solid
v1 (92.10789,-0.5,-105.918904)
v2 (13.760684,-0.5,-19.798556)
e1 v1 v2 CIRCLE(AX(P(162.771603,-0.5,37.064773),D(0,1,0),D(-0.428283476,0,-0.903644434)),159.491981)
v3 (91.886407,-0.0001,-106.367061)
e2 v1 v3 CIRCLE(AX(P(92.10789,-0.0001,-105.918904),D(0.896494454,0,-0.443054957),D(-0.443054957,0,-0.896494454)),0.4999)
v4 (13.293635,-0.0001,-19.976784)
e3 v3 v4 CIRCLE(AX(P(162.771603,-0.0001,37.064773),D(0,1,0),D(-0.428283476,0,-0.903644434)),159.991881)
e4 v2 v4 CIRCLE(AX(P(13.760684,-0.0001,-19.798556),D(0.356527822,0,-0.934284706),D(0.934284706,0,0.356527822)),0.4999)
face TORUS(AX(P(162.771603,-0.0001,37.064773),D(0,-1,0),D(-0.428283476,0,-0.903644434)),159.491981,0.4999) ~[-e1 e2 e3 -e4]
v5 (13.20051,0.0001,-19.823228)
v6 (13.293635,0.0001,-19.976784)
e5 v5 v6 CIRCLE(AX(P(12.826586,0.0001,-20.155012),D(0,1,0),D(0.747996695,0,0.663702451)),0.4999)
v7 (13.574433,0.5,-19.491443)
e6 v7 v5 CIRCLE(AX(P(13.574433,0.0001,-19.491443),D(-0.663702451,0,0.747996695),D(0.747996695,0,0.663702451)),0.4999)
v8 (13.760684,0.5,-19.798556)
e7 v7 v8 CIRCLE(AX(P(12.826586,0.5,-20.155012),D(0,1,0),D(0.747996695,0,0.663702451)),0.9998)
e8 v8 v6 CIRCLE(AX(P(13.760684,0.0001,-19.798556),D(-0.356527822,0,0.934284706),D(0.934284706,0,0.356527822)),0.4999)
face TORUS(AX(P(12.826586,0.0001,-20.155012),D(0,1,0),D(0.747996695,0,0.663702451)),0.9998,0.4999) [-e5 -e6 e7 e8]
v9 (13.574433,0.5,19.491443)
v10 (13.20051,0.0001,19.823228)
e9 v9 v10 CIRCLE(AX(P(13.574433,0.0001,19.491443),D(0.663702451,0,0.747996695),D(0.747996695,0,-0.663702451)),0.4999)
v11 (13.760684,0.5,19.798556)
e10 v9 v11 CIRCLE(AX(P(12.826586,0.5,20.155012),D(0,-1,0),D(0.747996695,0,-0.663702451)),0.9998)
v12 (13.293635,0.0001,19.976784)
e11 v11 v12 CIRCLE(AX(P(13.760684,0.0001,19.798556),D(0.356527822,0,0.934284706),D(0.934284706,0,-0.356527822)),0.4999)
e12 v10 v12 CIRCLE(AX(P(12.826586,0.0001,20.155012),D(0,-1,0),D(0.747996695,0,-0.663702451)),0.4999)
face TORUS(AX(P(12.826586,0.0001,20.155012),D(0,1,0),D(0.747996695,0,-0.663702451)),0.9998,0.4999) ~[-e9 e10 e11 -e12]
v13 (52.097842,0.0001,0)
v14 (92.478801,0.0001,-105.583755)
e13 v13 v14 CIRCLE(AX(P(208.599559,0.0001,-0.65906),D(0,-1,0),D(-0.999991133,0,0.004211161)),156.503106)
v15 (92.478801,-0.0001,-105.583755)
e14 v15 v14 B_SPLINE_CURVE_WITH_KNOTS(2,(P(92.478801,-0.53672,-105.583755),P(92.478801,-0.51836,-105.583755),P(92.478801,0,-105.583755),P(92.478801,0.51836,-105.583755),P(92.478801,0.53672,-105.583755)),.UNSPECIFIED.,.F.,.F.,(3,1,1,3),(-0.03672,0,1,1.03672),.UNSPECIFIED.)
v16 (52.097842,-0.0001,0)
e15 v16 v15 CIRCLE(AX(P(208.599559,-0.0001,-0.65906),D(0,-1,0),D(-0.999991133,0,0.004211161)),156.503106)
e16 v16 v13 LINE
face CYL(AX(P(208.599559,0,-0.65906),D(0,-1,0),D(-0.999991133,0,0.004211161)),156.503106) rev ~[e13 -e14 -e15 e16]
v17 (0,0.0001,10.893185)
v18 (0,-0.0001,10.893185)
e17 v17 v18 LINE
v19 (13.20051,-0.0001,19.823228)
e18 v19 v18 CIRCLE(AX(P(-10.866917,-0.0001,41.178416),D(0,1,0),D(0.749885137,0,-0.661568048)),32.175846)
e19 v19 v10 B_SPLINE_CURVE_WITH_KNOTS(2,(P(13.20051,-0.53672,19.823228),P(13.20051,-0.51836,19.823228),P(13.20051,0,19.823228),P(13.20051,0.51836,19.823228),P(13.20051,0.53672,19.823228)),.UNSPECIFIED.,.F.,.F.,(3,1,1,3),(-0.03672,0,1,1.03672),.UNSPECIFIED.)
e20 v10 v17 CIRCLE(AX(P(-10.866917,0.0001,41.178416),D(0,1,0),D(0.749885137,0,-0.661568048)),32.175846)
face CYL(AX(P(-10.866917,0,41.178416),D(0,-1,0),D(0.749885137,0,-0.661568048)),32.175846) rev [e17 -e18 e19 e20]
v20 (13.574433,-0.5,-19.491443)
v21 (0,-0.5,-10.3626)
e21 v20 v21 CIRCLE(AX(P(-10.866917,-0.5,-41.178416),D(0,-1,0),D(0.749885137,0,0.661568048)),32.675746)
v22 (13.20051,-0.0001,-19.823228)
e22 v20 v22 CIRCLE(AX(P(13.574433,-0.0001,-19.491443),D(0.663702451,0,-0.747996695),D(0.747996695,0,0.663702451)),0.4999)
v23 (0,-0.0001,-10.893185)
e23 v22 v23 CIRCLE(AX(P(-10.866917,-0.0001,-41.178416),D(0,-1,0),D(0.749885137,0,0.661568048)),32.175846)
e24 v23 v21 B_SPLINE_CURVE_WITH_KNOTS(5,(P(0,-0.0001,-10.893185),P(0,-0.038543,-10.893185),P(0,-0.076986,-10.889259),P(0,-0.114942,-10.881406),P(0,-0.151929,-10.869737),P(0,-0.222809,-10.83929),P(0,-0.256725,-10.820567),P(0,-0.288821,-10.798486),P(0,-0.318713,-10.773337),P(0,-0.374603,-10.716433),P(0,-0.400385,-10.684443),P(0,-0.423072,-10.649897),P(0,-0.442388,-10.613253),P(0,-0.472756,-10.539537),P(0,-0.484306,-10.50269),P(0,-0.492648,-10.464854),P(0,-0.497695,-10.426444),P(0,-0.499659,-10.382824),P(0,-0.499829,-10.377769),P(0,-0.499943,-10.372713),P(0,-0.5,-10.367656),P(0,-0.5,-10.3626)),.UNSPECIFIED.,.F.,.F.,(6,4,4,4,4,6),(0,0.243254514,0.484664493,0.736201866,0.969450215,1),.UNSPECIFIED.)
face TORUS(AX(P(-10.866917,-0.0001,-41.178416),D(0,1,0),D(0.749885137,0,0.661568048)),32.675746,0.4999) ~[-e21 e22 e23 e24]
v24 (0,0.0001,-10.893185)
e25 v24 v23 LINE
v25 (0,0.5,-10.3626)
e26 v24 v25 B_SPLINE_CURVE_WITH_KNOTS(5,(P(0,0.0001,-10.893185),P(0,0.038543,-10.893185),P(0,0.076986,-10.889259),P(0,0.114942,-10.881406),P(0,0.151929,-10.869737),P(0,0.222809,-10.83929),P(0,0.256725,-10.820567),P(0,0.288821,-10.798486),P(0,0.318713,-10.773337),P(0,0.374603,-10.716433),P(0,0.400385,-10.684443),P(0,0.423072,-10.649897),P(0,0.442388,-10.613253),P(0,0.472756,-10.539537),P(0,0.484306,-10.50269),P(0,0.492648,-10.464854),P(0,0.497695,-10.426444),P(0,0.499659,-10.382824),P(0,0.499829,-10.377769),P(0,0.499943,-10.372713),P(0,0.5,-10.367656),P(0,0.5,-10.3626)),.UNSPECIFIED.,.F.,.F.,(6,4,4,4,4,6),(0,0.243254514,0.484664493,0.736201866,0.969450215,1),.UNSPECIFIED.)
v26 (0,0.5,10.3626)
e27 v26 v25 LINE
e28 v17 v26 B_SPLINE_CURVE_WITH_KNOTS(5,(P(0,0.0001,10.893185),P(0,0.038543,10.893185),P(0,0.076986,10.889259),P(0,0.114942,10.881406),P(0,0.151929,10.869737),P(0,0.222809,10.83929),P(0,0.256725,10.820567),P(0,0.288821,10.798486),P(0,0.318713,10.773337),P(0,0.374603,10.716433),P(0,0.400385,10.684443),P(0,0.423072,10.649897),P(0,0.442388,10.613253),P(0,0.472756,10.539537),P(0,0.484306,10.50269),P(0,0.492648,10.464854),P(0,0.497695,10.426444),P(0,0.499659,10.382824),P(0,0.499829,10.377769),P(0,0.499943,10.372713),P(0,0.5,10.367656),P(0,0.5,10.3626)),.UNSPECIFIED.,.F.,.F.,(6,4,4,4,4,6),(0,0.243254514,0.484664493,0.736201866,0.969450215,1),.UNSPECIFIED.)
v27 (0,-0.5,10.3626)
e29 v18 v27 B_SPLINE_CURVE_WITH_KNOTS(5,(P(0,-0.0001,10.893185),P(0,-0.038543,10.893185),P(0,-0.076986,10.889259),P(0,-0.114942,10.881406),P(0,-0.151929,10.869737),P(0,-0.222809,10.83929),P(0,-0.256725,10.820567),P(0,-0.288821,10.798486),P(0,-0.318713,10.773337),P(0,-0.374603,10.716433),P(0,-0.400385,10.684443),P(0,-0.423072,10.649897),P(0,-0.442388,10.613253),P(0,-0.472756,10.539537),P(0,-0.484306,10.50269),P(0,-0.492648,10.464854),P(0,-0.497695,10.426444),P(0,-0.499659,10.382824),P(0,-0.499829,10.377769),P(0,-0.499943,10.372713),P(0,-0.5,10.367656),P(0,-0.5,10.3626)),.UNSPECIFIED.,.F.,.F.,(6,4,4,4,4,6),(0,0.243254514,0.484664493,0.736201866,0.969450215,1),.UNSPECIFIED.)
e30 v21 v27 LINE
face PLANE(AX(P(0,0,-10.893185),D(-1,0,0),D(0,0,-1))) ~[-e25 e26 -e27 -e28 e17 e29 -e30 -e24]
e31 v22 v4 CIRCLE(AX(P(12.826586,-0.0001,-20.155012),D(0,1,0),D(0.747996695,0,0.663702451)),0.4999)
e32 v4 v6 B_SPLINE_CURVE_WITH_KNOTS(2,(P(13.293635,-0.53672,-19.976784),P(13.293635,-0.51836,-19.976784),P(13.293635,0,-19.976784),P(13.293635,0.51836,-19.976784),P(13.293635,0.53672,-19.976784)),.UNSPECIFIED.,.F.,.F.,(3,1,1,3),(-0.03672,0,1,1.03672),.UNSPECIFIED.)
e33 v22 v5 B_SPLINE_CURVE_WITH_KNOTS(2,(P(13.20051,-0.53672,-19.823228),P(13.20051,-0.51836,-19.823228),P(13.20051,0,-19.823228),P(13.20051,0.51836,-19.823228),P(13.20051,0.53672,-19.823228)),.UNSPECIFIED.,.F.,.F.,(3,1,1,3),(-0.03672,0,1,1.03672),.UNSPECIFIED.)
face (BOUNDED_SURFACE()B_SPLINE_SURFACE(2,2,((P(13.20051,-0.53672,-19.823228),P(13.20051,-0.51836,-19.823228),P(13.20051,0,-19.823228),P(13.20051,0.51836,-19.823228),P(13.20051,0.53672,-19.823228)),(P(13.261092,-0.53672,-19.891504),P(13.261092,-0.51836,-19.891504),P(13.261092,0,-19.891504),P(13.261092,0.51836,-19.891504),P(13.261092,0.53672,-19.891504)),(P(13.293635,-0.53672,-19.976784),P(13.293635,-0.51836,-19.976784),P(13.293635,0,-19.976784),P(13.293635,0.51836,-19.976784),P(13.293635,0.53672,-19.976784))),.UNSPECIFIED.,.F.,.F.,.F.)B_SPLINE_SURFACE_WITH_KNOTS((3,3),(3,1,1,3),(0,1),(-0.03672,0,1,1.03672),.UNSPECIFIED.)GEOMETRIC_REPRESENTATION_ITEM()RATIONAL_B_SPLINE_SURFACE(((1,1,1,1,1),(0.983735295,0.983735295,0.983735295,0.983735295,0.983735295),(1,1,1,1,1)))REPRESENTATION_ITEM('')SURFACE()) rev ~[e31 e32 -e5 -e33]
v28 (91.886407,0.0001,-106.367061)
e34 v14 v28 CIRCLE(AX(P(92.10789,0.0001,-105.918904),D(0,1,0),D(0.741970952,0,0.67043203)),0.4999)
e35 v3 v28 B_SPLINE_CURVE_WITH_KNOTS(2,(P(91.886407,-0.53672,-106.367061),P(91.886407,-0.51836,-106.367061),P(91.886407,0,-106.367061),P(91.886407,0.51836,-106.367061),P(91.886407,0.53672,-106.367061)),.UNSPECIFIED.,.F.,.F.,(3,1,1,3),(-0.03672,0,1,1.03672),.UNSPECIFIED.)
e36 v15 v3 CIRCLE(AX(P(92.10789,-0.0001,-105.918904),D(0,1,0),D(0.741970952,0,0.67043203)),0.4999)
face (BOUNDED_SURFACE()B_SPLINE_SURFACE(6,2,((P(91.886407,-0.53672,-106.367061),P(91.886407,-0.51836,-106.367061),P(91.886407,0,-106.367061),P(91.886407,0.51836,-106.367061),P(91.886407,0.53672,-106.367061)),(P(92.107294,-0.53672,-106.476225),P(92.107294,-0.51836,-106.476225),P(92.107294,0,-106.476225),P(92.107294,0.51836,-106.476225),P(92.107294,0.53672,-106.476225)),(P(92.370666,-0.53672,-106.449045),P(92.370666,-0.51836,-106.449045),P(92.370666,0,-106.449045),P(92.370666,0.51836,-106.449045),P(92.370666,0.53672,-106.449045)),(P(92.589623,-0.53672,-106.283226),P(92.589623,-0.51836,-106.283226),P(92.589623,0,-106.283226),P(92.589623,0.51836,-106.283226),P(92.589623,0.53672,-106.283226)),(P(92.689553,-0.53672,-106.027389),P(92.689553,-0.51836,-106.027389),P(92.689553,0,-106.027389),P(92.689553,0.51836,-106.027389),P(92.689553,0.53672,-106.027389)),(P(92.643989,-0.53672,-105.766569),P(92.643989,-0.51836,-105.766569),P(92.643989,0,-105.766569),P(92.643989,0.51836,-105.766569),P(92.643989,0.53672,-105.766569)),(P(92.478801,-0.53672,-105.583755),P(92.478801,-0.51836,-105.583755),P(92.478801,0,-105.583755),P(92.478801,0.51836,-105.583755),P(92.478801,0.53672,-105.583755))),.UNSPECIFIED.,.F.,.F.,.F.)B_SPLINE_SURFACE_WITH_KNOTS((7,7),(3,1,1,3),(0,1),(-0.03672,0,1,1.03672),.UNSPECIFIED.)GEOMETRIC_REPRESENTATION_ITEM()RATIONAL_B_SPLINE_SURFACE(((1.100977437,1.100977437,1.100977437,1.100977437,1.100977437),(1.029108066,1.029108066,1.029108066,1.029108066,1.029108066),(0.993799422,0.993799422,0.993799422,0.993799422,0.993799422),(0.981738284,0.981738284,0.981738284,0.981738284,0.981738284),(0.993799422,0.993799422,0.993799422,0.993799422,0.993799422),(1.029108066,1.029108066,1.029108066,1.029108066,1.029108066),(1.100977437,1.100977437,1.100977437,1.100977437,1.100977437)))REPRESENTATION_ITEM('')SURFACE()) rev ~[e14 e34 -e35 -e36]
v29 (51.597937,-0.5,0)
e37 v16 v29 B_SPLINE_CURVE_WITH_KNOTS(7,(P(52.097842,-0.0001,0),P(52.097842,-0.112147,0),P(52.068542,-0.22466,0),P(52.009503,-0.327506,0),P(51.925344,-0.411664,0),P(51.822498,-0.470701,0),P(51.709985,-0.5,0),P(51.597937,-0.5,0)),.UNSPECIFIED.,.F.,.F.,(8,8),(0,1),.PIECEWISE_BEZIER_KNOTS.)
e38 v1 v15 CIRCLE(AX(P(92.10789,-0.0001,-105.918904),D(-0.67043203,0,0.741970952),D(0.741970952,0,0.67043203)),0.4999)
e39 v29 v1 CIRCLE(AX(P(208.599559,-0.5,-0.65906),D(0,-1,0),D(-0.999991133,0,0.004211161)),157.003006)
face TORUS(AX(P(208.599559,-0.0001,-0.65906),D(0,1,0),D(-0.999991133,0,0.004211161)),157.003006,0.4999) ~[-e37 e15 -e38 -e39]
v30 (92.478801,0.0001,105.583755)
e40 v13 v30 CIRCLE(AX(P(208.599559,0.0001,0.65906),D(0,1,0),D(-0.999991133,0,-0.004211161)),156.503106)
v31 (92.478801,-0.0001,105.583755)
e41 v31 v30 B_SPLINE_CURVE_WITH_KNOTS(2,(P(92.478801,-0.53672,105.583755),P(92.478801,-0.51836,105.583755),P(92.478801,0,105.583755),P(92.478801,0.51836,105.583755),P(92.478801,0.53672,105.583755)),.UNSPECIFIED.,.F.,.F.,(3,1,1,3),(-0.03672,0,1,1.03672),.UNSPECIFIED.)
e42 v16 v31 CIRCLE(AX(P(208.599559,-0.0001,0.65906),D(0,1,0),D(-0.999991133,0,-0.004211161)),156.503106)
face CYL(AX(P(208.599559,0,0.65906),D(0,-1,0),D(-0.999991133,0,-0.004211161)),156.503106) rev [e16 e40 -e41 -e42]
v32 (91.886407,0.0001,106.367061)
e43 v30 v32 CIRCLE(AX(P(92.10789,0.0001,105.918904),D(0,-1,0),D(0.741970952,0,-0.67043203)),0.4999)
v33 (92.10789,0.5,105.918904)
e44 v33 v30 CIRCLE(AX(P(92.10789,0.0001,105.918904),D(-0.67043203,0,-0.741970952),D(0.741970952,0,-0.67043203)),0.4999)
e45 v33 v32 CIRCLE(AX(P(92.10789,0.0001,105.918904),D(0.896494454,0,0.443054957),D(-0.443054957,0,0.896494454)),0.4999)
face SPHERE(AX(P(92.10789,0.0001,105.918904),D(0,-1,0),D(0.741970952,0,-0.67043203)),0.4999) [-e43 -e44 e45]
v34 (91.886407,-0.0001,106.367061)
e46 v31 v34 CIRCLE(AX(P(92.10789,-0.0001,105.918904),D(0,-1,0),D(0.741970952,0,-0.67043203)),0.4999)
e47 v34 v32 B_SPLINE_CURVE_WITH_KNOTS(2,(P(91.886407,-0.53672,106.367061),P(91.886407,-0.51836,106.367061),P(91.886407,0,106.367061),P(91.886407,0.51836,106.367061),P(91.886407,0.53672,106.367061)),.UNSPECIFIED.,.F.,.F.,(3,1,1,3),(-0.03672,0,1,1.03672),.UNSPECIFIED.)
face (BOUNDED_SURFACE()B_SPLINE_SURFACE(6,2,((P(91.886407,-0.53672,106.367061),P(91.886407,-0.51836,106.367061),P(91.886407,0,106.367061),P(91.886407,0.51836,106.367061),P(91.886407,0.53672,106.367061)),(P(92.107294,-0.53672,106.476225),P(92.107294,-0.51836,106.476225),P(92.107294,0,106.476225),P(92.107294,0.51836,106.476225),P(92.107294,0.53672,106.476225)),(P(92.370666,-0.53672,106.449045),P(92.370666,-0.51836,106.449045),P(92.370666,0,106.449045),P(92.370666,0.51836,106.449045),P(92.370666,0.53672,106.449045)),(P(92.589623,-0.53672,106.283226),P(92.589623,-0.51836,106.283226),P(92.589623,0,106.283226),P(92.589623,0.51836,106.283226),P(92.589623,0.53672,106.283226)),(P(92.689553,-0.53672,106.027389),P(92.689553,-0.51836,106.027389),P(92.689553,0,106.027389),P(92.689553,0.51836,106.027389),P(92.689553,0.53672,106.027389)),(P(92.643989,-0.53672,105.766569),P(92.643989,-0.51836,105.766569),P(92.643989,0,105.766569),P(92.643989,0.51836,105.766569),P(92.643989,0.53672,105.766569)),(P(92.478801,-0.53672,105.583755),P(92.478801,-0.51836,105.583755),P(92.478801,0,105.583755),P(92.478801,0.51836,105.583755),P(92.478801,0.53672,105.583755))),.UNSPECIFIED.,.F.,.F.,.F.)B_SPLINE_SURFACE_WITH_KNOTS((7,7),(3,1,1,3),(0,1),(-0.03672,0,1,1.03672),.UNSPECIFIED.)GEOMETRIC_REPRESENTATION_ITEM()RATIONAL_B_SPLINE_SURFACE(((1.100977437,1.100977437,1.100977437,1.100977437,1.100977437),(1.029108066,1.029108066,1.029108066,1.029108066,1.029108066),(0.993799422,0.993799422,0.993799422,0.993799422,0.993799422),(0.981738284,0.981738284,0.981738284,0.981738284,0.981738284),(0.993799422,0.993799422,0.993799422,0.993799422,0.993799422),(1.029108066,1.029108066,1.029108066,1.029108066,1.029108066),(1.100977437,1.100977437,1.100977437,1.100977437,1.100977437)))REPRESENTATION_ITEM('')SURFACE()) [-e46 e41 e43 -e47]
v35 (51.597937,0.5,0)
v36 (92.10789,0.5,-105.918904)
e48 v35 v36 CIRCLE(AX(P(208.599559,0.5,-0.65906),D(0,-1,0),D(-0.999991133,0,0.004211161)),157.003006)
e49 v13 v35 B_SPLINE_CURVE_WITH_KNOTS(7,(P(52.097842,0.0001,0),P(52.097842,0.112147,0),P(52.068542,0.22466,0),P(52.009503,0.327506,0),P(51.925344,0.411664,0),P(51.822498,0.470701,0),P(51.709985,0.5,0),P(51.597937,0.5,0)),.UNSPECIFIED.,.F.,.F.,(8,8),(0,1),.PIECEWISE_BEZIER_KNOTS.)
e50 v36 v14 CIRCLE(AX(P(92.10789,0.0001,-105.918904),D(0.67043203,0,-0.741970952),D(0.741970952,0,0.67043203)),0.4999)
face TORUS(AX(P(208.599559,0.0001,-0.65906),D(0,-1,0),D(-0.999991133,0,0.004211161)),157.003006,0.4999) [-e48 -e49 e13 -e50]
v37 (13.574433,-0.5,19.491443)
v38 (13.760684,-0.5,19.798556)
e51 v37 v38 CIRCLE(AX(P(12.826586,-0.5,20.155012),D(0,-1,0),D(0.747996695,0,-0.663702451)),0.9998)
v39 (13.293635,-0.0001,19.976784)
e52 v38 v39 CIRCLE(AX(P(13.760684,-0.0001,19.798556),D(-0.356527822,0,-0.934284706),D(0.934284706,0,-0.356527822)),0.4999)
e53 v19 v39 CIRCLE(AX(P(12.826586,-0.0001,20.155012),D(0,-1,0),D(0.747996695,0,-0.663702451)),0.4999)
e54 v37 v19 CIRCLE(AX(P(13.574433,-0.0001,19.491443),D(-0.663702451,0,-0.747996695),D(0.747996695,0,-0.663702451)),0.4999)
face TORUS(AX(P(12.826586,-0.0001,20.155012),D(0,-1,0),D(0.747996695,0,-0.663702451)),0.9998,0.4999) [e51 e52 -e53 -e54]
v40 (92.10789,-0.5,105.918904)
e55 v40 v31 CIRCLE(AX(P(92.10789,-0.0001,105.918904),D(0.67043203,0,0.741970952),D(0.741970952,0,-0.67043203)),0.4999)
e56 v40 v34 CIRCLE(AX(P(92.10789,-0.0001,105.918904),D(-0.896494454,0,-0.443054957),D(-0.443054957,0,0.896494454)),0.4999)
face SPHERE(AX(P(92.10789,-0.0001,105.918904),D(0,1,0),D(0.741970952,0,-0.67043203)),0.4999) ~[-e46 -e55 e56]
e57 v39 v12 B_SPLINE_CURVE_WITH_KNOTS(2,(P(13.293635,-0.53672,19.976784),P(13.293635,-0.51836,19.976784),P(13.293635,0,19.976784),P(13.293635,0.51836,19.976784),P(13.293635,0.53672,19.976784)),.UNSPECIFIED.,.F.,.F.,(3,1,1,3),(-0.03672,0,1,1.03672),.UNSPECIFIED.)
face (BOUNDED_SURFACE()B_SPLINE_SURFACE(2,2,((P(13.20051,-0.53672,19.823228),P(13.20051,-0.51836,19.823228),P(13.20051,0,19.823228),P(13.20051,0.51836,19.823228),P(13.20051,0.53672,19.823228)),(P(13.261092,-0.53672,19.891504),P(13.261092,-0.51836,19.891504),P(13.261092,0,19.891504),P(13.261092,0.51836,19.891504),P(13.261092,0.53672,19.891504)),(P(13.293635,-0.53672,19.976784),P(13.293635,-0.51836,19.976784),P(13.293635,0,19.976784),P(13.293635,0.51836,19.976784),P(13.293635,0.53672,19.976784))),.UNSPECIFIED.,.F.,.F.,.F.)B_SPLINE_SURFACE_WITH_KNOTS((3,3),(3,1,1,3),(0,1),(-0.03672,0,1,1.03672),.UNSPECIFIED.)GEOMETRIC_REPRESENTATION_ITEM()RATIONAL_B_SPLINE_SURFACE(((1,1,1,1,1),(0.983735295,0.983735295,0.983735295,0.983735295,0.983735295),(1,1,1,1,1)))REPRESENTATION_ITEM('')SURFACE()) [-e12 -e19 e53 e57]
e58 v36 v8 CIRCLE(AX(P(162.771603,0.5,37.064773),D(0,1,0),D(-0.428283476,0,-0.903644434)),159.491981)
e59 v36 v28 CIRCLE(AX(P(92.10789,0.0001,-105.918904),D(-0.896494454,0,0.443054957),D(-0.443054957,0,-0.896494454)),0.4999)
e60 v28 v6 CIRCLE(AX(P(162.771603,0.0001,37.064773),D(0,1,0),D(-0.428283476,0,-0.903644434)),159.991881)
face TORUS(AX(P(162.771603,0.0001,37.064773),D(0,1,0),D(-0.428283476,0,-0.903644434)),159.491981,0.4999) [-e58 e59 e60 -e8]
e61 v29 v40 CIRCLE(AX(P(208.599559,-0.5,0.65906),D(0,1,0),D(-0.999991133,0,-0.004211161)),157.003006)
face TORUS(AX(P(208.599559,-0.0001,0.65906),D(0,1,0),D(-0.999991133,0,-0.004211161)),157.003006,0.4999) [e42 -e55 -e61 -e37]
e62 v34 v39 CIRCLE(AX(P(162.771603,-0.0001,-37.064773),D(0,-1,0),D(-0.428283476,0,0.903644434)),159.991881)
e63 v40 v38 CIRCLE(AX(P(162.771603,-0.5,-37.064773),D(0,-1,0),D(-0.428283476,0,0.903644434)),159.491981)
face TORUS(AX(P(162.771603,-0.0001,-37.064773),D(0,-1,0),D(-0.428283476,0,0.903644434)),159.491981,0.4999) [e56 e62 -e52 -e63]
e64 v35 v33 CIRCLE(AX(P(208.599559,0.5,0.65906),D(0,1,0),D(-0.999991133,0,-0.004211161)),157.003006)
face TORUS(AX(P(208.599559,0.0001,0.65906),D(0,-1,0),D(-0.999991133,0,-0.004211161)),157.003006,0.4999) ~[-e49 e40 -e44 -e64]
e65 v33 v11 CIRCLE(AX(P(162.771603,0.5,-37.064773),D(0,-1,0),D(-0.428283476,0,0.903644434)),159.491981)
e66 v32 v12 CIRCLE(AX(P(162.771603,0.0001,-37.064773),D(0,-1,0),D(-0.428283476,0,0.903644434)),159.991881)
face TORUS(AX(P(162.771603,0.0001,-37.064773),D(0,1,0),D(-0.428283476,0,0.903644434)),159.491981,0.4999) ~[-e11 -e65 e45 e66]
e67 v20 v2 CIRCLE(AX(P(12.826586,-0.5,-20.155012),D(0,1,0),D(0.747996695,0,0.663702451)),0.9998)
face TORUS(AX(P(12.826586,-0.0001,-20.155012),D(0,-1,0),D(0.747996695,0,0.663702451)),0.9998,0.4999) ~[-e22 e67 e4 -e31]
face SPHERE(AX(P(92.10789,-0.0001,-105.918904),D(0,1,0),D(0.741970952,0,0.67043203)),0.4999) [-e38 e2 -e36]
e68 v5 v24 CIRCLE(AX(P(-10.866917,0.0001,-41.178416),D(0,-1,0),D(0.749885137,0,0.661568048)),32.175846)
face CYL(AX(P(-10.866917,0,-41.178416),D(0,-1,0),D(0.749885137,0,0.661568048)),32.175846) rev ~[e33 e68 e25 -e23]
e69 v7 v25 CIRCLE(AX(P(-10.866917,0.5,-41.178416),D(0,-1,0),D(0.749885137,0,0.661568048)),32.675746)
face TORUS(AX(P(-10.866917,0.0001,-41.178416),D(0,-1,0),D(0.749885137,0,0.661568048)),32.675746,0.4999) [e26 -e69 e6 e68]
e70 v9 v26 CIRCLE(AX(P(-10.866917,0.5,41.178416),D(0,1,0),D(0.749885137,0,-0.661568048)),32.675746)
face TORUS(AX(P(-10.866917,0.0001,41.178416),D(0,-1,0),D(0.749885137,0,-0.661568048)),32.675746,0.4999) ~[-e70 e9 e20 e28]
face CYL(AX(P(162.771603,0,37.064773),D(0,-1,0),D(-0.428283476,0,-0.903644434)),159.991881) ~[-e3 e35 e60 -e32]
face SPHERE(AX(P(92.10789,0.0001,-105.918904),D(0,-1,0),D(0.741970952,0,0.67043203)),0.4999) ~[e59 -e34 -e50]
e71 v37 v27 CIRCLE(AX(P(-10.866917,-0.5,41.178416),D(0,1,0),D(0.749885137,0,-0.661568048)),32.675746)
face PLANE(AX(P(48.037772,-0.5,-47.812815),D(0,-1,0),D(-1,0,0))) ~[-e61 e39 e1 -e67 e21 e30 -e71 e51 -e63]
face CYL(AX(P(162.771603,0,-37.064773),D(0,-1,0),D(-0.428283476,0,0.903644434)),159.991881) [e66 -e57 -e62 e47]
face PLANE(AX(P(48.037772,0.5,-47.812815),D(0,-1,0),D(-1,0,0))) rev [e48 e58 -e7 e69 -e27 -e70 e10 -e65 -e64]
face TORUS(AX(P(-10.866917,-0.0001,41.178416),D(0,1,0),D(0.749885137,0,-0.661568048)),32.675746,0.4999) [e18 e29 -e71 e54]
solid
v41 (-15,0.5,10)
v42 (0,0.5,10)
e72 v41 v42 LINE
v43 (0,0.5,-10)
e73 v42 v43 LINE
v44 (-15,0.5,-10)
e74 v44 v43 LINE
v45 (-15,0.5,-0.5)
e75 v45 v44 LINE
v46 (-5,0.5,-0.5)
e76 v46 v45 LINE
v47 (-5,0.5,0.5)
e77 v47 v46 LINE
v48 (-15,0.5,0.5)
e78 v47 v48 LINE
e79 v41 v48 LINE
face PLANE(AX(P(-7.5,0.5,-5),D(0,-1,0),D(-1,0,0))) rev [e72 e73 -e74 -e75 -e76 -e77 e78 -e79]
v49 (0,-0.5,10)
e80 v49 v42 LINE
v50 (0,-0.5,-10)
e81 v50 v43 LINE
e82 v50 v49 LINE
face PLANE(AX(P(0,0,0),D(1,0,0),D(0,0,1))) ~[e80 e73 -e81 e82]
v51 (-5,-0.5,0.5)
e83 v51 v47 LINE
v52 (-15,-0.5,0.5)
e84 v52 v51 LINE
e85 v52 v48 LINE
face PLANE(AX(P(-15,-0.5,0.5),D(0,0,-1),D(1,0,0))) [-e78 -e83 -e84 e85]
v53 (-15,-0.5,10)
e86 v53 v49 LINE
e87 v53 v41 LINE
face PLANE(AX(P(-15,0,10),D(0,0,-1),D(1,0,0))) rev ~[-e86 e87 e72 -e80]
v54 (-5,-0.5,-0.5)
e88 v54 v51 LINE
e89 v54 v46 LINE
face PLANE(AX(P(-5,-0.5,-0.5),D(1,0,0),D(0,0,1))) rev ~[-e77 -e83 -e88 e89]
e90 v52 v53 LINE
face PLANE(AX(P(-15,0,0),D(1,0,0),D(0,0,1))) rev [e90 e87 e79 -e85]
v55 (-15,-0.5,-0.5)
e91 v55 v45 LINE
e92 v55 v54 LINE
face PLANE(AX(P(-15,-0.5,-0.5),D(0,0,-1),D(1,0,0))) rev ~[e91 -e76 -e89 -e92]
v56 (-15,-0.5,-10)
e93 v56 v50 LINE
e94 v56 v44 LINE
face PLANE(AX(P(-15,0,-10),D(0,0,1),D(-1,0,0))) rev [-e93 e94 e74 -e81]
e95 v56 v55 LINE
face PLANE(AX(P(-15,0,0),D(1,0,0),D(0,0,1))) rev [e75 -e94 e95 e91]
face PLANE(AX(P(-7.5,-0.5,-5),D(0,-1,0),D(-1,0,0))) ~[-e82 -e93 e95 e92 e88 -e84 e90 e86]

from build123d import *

# Parameters (mm, degrees)
F1_DEPTH = 0.5
F2_R     = 0.4999
F0_W     = 15
F0_H     = 10
F4_DEPTH = 0.5
F6_W     = 10
F6_H     = 1
F7_DEPTH = 1.0010001


# Not quite as in the source:
# - a fillet or chamfer is up to 0.001 mm smaller than in the source, because OpenCascade refuses the exact size


with BuildPart() as f1:
    # F0 (on Front) → F1 (new body, symmetric)
    with BuildSketch(Plane.XZ):
        with BuildLine():
            ThreePointArc((13.2612720792, 19.8919038619), (7.1998646271, 14.5536810673), (0, 10.8931848908))
            Line((0, 10.8931848908), (0, 10))
            Line((0, 10), (0, 0))
            Line((0, 0), (52.0978415222, 0))
            ThreePointArc((52.0978415222, 0), (62.8950817615, 57.7854744772), (94.2497236639, 107.511))
            ThreePointArc((94.2497236639, 107.511), (45.2820813919, 71.5336359019), (13.2612720792, 19.8919038619))
        make_face()
    extrude(amount=F1_DEPTH, both=True)

    # F2 (radius 0.5 in the source; OpenCascade refuses exactly that, so slightly less here)
    f2_edges = [f1.edges().sort_by_distance(p)[0] for p in [
        (7.199865, -0.5, 14.553681),
        (7.199865, 0.5, 14.553681),
        (45.282081, -0.5, 71.533636),
        (45.282081, 0.5, 71.533636),
        (13.261272, 0, 19.891904),
        (94.249724, 0, 107.511),
        (62.895082, 0.5, 57.785474),
        (62.895082, -0.5, 57.785474),
    ]]
    fillet(f2_edges, radius=F2_R)

    # F3: F1 across plane


with BuildPart() as f1_1:
    add(f1.part)
    add(f1.part.mirror(Plane.XY))


with BuildPart() as f4:
    # F0 (on Front) → F4 (new body, symmetric)
    with BuildSketch(Plane.XZ):
        with Locations((-7.5, 5)):
            Rectangle(F0_W, F0_H)
    extrude(amount=F4_DEPTH, both=True)

    # F5: F4 across plane


with BuildPart() as f4_1:
    add(f4.part)
    add(f4.part.mirror(Plane.XY))

    # F6 (on face) → F7 (cut, through all)
    with BuildSketch(Plane.XZ.offset(0.5)):
        with Locations((-10, 0)):
            Rectangle(F6_W, F6_H)
    extrude(amount=-F7_DEPTH, mode=Mode.SUBTRACT)


solid = Compound([f1_1.part, f4_1.part])
